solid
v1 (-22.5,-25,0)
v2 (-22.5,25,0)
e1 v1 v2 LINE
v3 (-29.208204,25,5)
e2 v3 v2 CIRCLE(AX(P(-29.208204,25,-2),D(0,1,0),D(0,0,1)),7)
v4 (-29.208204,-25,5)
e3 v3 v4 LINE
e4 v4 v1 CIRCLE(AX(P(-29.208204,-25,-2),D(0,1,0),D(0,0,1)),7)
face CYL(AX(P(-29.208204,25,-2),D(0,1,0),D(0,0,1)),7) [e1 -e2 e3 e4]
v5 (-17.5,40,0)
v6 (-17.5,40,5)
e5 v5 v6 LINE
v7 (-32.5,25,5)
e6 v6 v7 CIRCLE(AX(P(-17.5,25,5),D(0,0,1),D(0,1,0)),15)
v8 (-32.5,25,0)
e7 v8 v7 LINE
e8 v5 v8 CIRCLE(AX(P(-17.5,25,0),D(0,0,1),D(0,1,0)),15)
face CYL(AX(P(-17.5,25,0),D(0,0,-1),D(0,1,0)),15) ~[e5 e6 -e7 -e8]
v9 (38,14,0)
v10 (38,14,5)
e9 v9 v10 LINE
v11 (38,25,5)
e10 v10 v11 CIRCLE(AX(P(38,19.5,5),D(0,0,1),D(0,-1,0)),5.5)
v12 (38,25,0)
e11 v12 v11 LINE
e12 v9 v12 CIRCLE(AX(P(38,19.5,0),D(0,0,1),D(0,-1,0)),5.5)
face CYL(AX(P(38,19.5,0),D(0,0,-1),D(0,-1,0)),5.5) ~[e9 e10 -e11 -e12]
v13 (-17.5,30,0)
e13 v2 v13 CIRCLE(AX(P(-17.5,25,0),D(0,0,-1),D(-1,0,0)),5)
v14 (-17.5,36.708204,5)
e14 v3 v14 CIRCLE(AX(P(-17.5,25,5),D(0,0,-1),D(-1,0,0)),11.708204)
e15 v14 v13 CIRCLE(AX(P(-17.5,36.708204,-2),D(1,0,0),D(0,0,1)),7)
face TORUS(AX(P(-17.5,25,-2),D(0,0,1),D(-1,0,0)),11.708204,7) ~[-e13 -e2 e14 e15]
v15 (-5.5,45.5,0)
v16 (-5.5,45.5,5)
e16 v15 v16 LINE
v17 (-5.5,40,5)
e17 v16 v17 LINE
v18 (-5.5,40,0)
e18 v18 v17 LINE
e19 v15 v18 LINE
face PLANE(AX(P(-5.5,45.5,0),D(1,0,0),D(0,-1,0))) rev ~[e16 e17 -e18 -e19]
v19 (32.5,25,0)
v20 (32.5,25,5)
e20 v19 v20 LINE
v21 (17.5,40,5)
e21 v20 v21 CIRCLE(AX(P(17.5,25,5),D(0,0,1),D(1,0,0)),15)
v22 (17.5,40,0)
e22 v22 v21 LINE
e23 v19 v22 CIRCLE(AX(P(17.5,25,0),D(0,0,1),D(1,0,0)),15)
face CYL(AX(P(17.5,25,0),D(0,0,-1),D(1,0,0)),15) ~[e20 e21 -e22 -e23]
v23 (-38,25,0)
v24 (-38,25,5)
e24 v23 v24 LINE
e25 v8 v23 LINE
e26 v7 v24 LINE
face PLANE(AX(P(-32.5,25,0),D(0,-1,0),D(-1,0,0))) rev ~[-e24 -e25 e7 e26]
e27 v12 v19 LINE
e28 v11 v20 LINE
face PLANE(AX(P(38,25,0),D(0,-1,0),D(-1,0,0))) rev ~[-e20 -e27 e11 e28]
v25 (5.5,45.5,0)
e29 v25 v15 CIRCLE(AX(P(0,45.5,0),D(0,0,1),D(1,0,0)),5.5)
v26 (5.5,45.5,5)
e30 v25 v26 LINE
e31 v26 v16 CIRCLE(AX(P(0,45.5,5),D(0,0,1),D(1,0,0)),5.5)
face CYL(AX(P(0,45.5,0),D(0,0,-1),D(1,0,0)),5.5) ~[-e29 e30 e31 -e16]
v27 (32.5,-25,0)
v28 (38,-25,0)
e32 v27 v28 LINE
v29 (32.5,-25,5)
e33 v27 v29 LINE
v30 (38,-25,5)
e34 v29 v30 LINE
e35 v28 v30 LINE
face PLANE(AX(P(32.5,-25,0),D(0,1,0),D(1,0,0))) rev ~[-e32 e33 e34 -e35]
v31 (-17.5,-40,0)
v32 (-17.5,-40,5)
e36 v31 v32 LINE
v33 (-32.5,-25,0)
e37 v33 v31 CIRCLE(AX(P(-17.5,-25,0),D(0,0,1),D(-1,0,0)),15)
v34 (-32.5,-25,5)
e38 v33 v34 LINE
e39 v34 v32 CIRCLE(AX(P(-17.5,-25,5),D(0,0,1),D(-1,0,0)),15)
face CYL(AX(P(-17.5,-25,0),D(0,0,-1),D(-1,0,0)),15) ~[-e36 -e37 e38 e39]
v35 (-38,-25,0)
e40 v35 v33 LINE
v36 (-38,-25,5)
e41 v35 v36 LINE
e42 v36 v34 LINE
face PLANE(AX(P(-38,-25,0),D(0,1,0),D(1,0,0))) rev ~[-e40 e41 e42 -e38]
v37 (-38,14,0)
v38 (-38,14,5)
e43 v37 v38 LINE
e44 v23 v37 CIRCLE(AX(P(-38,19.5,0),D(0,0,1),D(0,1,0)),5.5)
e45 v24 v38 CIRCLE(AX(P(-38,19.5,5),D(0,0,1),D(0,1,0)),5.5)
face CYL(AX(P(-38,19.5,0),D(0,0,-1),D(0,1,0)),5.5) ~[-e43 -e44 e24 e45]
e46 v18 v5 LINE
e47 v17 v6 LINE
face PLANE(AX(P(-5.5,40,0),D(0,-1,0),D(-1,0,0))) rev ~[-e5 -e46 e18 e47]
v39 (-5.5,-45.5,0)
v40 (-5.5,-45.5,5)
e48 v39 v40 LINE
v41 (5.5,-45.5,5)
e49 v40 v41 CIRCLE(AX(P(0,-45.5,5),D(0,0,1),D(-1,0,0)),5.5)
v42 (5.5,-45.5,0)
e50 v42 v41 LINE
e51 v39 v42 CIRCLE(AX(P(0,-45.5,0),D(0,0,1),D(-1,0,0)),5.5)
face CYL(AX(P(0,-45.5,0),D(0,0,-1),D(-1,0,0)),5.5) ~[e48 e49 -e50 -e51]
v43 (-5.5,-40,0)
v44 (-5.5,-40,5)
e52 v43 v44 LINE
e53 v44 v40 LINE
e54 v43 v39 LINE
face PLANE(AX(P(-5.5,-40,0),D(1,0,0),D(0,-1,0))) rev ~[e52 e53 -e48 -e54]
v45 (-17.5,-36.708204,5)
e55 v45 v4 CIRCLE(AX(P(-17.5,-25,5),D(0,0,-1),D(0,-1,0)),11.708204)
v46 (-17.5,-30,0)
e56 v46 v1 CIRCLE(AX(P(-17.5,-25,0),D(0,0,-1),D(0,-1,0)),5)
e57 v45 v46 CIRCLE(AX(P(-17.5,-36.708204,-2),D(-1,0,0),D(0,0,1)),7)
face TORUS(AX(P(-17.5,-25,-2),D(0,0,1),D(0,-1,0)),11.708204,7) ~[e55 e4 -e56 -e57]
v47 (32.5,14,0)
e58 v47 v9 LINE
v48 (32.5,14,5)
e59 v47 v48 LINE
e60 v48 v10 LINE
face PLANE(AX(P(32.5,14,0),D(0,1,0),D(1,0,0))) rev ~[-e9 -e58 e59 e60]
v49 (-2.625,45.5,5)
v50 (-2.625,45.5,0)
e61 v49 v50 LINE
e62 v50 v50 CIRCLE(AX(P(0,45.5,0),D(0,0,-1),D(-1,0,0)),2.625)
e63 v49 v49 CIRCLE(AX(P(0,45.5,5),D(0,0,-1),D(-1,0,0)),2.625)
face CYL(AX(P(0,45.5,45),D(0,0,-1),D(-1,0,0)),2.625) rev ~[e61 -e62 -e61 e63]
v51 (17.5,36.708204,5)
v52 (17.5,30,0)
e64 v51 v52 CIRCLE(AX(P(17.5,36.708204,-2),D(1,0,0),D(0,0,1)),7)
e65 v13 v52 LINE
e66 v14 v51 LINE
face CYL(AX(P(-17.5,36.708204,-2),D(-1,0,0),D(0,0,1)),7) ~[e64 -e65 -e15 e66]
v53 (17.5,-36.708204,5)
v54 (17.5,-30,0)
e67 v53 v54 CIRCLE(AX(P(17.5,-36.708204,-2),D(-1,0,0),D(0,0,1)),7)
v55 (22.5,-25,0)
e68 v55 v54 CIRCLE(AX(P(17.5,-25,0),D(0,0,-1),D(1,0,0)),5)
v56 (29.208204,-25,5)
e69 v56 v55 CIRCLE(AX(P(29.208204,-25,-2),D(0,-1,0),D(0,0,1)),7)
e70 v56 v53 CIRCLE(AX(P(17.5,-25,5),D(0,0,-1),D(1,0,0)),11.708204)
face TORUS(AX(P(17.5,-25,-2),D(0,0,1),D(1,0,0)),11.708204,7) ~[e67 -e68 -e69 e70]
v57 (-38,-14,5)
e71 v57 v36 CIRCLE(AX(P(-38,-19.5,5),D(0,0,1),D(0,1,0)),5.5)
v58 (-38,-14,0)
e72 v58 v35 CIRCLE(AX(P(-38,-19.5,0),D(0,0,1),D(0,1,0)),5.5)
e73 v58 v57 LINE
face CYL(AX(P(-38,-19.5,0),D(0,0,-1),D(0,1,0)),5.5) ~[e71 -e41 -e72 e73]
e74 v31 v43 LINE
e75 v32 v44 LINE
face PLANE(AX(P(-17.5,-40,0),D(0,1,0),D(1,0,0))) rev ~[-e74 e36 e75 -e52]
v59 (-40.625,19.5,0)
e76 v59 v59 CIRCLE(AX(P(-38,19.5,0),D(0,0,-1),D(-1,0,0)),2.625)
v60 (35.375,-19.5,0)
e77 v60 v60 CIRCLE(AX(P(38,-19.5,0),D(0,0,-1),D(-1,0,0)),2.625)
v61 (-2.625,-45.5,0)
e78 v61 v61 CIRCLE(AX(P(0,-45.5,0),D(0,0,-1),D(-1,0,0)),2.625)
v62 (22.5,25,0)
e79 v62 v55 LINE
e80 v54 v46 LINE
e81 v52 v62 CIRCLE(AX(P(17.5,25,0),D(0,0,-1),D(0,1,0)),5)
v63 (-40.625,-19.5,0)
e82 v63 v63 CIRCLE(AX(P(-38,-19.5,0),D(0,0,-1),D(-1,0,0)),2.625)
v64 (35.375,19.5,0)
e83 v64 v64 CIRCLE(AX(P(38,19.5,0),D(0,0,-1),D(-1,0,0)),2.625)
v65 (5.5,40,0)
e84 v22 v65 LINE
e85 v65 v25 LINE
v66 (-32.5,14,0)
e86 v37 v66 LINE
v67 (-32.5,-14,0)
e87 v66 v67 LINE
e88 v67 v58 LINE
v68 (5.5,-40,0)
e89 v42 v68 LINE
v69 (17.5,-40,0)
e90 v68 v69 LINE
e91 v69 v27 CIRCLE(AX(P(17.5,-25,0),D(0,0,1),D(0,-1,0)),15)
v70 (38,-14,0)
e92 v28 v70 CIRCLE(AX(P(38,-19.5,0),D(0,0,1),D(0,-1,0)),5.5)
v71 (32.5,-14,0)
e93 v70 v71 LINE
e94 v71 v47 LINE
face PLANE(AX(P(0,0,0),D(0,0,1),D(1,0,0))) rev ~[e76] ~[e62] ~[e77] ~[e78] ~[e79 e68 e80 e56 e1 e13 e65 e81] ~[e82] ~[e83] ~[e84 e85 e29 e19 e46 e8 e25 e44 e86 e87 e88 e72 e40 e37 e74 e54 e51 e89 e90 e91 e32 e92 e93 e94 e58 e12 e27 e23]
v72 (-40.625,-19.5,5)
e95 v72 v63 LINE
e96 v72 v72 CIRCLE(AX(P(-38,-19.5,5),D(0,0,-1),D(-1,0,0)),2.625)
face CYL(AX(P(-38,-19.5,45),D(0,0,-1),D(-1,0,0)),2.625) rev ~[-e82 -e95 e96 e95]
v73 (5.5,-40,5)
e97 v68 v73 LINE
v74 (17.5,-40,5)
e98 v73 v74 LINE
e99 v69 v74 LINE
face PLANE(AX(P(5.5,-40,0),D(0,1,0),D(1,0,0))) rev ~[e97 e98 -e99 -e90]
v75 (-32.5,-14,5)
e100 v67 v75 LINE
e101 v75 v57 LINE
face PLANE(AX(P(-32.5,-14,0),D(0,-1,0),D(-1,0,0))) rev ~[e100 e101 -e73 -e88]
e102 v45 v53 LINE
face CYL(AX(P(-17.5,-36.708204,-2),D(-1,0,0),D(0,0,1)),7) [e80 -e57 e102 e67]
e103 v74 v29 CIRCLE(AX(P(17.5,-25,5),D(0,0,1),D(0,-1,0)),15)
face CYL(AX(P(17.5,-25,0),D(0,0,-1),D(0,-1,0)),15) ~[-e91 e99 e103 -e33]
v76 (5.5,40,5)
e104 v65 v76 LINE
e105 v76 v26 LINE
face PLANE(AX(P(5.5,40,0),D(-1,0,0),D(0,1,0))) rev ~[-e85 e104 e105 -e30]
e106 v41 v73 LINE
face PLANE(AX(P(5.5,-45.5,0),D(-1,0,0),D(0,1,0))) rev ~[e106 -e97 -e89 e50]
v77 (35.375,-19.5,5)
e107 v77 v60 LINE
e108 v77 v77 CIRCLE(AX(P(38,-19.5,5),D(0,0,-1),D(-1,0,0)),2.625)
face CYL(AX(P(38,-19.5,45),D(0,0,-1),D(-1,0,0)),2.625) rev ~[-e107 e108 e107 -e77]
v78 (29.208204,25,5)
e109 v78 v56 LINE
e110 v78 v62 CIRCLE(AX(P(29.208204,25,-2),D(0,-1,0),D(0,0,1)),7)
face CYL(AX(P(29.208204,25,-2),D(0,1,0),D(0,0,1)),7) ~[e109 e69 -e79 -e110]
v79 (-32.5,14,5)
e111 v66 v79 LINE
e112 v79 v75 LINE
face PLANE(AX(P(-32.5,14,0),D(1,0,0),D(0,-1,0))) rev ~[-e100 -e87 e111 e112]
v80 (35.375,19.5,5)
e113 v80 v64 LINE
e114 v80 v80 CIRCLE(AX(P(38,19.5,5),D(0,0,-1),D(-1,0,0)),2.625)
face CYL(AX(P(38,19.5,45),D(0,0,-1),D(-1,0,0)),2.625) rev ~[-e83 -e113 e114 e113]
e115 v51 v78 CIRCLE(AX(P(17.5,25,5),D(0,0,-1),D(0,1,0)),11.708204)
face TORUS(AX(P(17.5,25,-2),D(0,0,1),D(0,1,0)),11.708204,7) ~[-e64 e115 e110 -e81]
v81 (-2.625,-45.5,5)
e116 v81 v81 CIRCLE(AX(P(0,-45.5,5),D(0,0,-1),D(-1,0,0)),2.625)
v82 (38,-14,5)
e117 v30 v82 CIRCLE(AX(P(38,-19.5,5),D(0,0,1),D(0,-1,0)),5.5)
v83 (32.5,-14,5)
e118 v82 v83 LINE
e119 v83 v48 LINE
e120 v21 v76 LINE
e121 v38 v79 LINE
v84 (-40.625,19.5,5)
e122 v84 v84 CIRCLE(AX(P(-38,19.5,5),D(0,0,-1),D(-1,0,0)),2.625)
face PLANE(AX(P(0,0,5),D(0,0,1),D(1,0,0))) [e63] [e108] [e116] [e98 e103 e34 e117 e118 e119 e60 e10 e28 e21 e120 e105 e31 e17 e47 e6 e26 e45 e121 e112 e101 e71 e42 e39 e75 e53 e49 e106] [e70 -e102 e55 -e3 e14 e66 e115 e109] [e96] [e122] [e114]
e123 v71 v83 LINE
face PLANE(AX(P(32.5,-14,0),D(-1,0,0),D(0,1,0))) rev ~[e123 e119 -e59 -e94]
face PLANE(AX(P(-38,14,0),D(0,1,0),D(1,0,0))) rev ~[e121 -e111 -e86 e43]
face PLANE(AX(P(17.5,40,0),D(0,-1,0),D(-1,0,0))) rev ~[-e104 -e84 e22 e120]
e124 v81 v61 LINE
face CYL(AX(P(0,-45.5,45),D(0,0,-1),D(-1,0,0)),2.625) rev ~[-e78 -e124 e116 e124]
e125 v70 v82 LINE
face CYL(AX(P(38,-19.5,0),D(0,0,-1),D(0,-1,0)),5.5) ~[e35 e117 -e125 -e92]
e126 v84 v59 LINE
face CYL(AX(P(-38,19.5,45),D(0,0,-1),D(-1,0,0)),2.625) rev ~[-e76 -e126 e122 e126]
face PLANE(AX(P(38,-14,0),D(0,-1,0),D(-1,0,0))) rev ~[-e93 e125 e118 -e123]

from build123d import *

# Parameters (mm, degrees)
F1_DEPTH     = 5
F3_D         = 5.25
F3_DEPTH     = 40
F3_TIP       = 1.5772591249
F4_T1_DEPTH  = 50
F4_T3_DEPTH  = 35
F4_T6_ANGLE  = 90
F4_T8_ANGLE  = 90
F4_T10_ANGLE = 90
F4_T12_ANGLE = 90


# Not quite as in the source:
# - a fillet or chamfer that OpenCascade refuses, or shapes differently, is made with other operations: its cross-section is extruded or revolved along the edge and cut away or added


with BuildPart() as f1:
    # F0 (on Top) → F1 (new body)
    with BuildSketch(Plane.XY):
        with BuildLine():
            Line((-38, -25), (-32.5, -25))
            ThreePointArc((-32.5, -25), (-28.1066017178, -35.6066017178), (-17.5, -40))
            Line((-17.5, -40), (-5.5, -40))
            Line((-5.5, -40), (-5.5, -45.5))
            ThreePointArc((-5.5, -45.5), (0, -51), (5.5, -45.5))
            Line((5.5, -45.5), (5.5, -40))
            Line((5.5, -40), (17.5, -40))
            ThreePointArc((17.5, -40), (28.1066017178, -35.6066017178), (32.5, -25))
            Line((32.5, -25), (38, -25))
            ThreePointArc((38, -25), (43.5, -19.5), (38, -14))
            Line((38, -14), (32.5, -14))
            Line((32.5, -14), (32.5, 14))
            Line((32.5, 14), (38, 14))
            ThreePointArc((38, 14), (43.5, 19.5), (38, 25))
            Line((38, 25), (32.5, 25))
            ThreePointArc((32.5, 25), (28.1066017178, 35.6066017178), (17.5, 40))
            Line((17.5, 40), (5.5, 40))
            Line((5.5, 40), (5.5, 45.5))
            ThreePointArc((5.5, 45.5), (0, 51), (-5.5, 45.5))
            Line((-5.5, 45.5), (-5.5, 40))
            Line((-5.5, 40), (-17.5, 40))
            ThreePointArc((-17.5, 40), (-28.1066017178, 35.6066017178), (-32.5, 25))
            Line((-32.5, 25), (-38, 25))
            ThreePointArc((-38, 25), (-43.5, 19.5), (-38, 14))
            Line((-38, 14), (-32.5, 14))
            Line((-32.5, 14), (-32.5, -14))
            Line((-32.5, -14), (-38, -14))
            ThreePointArc((-38, -14), (-43.5, -19.5), (-38, -25))
        make_face()
        with BuildLine():
            Line((17.5, -30), (-17.5, -30))
            ThreePointArc((-17.5, -30), (-21.0355339059, -28.5355339059), (-22.5, -25))
            Line((-22.5, -25), (-22.5, 25))
            ThreePointArc((-22.5, 25), (-21.0355339059, 28.5355339059), (-17.5, 30))
            Line((-17.5, 30), (17.5, 30))
            ThreePointArc((17.5, 30), (21.0355339059, 28.5355339059), (22.5, 25))
            Line((22.5, 25), (22.5, -25))
            ThreePointArc((22.5, -25), (21.0355339059, -28.5355339059), (17.5, -30))
        make_face(mode=Mode.SUBTRACT)
    extrude(amount=F1_DEPTH)

    # F3
    with Locations(Plane.XY.offset(5)):
        with Locations((-38, 19.5), (0, 45.5), (38, 19.5), (38, -19.5), (0, -45.5), (-38, -19.5)):
            Hole(F3_D / 2, depth=F3_DEPTH)
            with Locations((0, 0, -(F3_DEPTH + F3_TIP / 2))):  # 118° drill point
                Cone(0, F3_D / 2, F3_TIP, mode=Mode.SUBTRACT)

    # F4: fillet of radius 7 on 1 edges, made by hand

    # F4_s2 → F4_t1 (cut)
    with BuildSketch(Plane.XZ.offset(-25)):
        with BuildLine():
            ThreePointArc((-29.2082039325, 5), (-25.0249037998, 3.6124860802), (-22.5, 0))
            Line((-22.5, 0), (-22.5, 5))
            Line((-22.5, 5), (-29.2082039325, 5))
        make_face()
        with BuildLine():
            ThreePointArc((29.2082039325, 5), (25.0249037998, 3.6124860802), (22.5, 0))
            Line((22.5, 0), (22.5, 5))
            Line((22.5, 5), (29.2082039325, 5))
        make_face()
    extrude(amount=F4_T1_DEPTH, mode=Mode.SUBTRACT)

    # F4_s4 → F4_t3 (cut)
    with BuildSketch(Plane.YZ.offset(-17.5)):
        with BuildLine():
            ThreePointArc((36.7082039325, 5), (32.5249037998, 3.6124860802), (30, 0))
            Line((30, 0), (30, 5))
            Line((30, 5), (36.7082039325, 5))
        make_face()
        with BuildLine():
            ThreePointArc((-36.7082039325, 5), (-32.5249037998, 3.6124860802), (-30, 0))
            Line((-30, 0), (-30, 5))
            Line((-30, 5), (-36.7082039325, 5))
        make_face()
    extrude(amount=F4_T3_DEPTH, mode=Mode.SUBTRACT)

    # F4_s5 → F4_t6 (revolve, cut)
    with BuildSketch(Plane.YZ.offset(-17.5)):
        with BuildLine():
            ThreePointArc((-36.7082039325, 5), (-32.5249037998, 3.6124860802), (-30, 0))
            Line((-30, 0), (-30, 5))
            Line((-30, 5), (-36.7082039325, 5))
        make_face()
    revolve(axis=Axis((-17.5, -25, 5), (0, 0, -1)), revolution_arc=F4_T6_ANGLE, mode=Mode.SUBTRACT)

    # F4_s7 → F4_t8 (revolve, cut)
    with BuildSketch(Plane.XZ.offset(-25)):
        with BuildLine():
            ThreePointArc((-29.2082039325, 5), (-25.0249037998, 3.6124860802), (-22.5, 0))
            Line((-22.5, 0), (-22.5, 5))
            Line((-22.5, 5), (-29.2082039325, 5))
        make_face()
    revolve(axis=Axis((-17.5, 25, 5), (0, 0, -1)), revolution_arc=F4_T8_ANGLE, mode=Mode.SUBTRACT)

    # F4_s9 → F4_t10 (revolve, cut)
    with BuildSketch(Plane.YZ.offset(17.5)):
        with BuildLine():
            ThreePointArc((36.7082039325, 5), (32.5249037998, 3.6124860802), (30, 0))
            Line((30, 0), (30, 5))
            Line((30, 5), (36.7082039325, 5))
        make_face()
    revolve(axis=Axis((17.5, 25, 5), (0, 0, -1)), revolution_arc=F4_T10_ANGLE, mode=Mode.SUBTRACT)

    # F4_s11 → F4_t12 (revolve, cut)
    with BuildSketch(Plane.XZ.offset(25)):
        with BuildLine():
            ThreePointArc((29.2082039325, 5), (25.0249037998, 3.6124860802), (22.5, 0))
            Line((22.5, 0), (22.5, 5))
            Line((22.5, 5), (29.2082039325, 5))
        make_face()
    revolve(axis=Axis((17.5, -25, 5), (0, 0, -1)), revolution_arc=F4_T12_ANGLE, mode=Mode.SUBTRACT)


solid = f1.part
